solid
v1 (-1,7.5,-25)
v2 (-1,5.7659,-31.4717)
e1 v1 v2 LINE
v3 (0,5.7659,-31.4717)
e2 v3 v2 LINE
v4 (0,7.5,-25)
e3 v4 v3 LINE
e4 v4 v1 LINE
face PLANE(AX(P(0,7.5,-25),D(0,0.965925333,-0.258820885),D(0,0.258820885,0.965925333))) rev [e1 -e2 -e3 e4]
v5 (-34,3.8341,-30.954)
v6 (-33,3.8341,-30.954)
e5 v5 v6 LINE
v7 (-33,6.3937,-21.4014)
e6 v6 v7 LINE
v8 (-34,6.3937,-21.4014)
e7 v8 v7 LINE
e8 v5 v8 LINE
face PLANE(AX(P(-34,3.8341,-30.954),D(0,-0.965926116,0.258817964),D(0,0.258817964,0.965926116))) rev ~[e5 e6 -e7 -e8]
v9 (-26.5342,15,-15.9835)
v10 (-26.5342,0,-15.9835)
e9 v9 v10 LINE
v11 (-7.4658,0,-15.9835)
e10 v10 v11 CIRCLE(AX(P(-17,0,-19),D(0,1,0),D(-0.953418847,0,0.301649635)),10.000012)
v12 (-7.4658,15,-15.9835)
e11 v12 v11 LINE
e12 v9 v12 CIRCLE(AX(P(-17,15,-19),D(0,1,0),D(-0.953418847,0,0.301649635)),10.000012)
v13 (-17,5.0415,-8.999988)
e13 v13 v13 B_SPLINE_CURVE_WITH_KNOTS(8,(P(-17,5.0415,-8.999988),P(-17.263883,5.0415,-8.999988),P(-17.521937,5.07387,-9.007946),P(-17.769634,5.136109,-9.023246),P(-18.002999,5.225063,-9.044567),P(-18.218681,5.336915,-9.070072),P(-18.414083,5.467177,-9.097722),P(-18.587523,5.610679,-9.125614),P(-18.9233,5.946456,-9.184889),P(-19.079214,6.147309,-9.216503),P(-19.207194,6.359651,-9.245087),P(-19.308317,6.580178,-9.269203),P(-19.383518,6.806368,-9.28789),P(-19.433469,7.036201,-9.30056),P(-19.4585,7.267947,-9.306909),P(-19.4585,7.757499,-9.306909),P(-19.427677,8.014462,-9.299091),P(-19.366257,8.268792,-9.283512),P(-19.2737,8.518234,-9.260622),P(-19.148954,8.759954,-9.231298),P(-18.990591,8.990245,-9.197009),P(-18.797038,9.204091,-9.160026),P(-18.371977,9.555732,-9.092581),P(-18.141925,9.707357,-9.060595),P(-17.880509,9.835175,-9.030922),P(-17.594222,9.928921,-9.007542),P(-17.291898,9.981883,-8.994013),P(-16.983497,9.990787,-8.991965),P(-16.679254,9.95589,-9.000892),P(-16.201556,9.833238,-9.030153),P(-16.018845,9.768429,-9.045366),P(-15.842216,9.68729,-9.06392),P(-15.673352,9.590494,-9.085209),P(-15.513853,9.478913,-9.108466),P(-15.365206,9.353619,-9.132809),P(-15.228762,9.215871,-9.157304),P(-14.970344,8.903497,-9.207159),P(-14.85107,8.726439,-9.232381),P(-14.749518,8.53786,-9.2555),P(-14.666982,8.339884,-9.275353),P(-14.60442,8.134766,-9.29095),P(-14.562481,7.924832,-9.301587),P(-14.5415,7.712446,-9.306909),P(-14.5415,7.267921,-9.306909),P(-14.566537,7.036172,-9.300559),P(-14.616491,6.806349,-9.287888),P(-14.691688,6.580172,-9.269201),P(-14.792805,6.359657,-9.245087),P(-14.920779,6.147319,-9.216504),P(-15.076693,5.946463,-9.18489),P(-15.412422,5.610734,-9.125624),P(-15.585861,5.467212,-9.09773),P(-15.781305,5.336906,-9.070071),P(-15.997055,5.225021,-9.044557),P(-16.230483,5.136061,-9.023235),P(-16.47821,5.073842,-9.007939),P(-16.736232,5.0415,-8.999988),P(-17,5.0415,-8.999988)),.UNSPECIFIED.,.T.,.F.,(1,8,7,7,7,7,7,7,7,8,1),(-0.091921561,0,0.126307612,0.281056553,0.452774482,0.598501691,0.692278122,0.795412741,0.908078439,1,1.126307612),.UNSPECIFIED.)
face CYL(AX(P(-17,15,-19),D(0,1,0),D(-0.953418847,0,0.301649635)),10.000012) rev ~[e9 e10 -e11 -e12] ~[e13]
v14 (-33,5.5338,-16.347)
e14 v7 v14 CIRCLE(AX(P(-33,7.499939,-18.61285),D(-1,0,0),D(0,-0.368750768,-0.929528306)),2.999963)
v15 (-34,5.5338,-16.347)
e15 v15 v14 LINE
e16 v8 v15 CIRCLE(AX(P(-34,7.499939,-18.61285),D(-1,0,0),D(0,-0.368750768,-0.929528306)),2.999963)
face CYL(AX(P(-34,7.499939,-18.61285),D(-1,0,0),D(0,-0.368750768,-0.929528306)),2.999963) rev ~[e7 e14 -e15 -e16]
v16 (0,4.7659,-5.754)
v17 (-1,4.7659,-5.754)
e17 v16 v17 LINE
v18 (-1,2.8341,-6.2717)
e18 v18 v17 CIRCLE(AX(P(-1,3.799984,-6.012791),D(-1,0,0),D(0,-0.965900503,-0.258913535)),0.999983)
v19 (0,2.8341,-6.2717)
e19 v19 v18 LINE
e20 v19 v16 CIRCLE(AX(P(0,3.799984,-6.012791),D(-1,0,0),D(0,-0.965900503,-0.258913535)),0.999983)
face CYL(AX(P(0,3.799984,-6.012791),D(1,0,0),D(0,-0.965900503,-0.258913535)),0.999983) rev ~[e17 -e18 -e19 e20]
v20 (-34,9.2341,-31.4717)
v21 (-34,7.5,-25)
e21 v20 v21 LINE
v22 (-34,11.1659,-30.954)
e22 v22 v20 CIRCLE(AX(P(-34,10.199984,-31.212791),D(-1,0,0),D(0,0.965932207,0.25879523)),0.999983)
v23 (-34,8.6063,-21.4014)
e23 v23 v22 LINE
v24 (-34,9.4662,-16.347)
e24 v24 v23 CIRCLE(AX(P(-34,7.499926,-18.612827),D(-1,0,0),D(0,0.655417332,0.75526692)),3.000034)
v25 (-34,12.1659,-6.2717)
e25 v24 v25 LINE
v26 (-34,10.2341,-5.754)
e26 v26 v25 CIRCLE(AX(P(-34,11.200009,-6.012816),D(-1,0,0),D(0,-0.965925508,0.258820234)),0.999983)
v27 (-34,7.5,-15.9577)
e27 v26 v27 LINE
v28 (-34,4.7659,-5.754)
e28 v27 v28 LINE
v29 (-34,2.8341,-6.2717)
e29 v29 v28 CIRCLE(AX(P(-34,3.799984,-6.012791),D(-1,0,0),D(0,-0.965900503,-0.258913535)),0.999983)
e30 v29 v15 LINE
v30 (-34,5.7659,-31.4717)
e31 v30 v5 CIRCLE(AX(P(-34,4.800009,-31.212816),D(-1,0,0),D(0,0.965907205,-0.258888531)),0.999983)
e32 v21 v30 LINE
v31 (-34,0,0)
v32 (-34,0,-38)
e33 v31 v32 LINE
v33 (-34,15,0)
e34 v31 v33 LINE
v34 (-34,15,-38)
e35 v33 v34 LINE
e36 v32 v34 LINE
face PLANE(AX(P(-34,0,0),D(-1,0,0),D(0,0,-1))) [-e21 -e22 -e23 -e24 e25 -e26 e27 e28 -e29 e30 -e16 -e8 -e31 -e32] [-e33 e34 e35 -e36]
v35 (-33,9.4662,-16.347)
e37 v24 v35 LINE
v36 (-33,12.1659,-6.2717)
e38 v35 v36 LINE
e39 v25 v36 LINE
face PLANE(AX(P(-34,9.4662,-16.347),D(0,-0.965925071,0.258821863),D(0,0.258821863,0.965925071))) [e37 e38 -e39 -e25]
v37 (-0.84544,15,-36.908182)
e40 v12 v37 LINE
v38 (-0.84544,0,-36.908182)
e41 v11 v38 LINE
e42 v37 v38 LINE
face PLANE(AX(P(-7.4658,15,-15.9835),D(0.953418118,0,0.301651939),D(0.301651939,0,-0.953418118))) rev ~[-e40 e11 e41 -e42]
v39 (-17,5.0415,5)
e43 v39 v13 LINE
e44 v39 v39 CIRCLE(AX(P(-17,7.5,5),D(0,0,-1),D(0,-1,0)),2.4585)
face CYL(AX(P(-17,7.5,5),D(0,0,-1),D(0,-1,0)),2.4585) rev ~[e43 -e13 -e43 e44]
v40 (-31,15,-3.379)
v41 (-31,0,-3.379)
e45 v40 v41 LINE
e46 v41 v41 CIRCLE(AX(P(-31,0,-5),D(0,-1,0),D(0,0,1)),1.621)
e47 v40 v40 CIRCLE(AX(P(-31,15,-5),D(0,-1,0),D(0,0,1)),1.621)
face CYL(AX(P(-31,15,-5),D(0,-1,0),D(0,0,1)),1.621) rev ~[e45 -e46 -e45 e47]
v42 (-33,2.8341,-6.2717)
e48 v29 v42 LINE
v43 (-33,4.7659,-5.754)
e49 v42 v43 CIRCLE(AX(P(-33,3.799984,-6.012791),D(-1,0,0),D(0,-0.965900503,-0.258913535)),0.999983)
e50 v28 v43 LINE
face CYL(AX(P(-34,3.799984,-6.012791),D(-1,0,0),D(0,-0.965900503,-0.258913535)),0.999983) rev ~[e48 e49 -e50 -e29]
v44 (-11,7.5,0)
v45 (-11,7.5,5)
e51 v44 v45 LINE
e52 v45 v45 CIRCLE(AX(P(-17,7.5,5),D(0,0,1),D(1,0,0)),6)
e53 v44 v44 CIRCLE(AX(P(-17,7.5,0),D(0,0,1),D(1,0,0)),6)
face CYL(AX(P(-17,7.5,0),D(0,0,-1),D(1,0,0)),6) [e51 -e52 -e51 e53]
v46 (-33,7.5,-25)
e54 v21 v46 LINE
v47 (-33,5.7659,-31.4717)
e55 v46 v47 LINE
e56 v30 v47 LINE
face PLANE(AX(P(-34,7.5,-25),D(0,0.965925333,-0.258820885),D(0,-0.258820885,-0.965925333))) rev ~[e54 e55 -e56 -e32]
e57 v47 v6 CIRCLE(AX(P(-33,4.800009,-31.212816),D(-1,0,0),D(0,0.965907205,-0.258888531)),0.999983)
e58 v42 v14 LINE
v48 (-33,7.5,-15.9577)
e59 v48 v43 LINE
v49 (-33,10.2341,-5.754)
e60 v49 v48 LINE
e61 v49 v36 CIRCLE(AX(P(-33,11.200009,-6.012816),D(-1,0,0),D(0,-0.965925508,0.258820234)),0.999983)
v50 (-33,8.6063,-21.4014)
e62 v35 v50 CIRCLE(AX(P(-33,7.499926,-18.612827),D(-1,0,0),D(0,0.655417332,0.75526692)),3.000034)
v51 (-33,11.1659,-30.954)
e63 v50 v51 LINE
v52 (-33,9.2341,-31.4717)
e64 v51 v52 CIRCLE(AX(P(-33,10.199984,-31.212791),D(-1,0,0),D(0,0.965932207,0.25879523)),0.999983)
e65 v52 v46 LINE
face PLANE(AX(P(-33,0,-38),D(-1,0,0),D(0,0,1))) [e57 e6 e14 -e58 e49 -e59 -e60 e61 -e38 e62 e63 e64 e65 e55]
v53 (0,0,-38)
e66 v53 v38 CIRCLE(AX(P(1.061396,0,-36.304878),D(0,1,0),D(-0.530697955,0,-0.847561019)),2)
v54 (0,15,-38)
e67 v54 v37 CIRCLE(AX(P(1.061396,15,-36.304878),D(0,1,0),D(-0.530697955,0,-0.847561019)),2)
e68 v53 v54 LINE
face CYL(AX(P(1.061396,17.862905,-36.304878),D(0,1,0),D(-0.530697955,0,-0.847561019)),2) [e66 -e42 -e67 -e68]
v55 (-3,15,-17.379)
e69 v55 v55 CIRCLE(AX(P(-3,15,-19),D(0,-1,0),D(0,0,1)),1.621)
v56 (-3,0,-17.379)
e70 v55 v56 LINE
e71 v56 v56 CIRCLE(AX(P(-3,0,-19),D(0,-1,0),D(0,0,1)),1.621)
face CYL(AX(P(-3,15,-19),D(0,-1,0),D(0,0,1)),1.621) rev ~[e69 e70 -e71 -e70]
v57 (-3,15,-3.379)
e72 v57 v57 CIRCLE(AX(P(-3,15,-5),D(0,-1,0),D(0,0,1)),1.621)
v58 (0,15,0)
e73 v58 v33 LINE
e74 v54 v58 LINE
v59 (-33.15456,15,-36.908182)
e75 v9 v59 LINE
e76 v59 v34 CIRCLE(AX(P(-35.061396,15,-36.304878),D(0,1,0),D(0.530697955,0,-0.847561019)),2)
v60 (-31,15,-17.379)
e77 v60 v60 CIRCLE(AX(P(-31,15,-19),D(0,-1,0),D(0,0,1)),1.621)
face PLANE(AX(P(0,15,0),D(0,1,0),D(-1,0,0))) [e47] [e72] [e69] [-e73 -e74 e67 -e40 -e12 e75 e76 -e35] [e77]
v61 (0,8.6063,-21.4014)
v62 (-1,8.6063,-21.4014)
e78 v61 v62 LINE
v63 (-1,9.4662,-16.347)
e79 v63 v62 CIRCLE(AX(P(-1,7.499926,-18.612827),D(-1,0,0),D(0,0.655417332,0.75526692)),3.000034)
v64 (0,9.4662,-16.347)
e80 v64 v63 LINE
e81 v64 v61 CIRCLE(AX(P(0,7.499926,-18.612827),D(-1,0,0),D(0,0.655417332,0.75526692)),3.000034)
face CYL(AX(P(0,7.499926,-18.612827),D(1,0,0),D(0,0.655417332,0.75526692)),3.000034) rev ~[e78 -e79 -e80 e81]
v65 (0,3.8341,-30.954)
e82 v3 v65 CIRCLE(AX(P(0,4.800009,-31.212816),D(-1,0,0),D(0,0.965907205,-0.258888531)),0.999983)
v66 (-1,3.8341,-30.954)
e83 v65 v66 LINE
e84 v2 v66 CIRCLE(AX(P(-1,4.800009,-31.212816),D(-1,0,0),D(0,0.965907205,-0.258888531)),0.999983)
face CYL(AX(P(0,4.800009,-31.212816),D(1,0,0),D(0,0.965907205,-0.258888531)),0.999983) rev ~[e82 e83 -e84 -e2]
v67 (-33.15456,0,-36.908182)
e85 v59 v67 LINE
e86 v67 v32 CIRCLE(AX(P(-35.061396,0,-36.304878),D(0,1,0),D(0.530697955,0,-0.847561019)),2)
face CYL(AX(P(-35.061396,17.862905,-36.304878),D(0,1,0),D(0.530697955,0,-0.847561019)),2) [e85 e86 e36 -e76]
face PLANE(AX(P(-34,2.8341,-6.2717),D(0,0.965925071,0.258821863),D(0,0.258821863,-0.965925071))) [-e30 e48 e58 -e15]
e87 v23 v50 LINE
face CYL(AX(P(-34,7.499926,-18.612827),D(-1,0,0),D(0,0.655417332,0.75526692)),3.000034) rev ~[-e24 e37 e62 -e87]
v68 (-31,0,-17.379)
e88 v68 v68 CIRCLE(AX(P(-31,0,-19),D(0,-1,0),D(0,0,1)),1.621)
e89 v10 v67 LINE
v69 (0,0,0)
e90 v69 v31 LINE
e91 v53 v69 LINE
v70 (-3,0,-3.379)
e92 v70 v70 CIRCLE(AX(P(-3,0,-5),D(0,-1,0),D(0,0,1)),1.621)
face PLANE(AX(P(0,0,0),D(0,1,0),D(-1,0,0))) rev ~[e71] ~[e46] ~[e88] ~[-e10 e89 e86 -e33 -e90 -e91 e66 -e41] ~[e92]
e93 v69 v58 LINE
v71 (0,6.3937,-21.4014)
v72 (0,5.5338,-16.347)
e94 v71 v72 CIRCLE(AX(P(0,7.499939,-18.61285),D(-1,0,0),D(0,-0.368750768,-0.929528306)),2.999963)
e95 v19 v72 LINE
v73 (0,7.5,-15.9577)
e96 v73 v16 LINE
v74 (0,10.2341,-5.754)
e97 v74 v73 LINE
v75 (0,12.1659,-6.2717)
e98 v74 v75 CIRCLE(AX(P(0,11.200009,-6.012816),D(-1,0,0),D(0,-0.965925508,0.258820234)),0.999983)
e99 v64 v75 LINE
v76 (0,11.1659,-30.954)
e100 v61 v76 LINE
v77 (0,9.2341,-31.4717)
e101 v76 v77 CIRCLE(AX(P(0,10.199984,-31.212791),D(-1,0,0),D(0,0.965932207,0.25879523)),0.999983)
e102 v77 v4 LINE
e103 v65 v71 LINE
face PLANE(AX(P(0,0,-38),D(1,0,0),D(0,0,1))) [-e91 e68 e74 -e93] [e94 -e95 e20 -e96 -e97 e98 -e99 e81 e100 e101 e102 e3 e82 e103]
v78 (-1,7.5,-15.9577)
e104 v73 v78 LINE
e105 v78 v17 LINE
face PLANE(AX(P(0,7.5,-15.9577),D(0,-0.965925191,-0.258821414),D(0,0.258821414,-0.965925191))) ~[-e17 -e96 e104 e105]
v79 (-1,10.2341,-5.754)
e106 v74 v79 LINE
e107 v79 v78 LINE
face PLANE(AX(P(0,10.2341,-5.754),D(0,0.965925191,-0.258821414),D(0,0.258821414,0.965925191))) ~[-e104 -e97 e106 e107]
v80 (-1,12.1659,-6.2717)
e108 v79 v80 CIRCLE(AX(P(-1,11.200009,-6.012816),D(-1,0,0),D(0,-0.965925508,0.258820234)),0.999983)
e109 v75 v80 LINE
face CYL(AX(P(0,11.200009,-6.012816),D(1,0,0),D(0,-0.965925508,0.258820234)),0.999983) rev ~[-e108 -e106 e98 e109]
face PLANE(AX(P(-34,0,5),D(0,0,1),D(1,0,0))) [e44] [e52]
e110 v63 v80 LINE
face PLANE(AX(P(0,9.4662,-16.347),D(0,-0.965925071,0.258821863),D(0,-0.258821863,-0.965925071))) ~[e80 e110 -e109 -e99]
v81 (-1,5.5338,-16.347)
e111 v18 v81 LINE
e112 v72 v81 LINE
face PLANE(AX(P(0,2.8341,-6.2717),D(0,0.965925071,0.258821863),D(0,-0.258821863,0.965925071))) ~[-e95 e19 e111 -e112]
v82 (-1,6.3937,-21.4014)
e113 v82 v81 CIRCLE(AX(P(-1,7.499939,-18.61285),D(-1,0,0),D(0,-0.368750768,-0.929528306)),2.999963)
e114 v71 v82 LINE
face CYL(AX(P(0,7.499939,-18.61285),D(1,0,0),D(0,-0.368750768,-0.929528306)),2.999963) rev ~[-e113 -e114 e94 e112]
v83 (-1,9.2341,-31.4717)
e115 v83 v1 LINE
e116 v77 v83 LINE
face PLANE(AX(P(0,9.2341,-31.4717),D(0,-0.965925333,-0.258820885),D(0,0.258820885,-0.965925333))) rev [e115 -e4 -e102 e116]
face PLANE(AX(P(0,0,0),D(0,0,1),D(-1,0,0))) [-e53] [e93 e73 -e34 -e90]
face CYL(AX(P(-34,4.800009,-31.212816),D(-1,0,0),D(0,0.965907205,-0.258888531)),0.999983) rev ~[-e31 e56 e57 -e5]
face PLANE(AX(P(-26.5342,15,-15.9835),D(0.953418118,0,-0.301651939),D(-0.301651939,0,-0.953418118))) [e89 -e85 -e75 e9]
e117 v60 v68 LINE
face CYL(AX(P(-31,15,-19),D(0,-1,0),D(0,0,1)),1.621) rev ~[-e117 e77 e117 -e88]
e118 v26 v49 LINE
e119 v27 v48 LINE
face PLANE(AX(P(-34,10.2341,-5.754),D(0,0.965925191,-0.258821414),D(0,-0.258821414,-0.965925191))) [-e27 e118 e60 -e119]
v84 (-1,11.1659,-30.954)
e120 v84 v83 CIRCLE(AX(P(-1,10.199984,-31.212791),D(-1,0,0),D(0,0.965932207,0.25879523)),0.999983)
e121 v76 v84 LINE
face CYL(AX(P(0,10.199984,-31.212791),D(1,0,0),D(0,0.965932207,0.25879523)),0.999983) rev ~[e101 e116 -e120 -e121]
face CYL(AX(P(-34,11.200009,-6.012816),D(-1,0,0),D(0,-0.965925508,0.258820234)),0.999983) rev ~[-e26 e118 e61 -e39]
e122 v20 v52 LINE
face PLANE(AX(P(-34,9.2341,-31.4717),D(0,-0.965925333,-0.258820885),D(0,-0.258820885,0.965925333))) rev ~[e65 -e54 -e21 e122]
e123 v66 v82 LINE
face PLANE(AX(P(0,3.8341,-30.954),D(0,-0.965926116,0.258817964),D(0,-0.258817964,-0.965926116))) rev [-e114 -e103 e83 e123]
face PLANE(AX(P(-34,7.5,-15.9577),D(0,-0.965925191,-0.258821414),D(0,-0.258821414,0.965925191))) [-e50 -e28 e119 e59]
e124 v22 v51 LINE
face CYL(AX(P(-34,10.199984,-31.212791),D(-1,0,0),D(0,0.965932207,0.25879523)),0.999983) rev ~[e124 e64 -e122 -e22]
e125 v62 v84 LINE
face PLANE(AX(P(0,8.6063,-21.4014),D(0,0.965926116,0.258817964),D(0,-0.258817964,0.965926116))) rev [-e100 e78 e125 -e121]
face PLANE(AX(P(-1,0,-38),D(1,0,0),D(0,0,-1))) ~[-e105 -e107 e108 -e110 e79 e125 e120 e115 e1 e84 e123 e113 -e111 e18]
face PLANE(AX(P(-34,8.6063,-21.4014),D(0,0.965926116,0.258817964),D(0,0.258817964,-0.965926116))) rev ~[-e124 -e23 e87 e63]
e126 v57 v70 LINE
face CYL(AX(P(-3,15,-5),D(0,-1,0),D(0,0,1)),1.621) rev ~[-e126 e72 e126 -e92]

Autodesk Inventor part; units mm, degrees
ref_plane "XZ Plane" through (0, 0, 0) normal (0, 1, 0) x (-1, 0, 0)
ref_plane "XY Plane" through (0, 0, 0) normal (0, 0, 1) x (1, 0, 0)
sketch "Sketch1" plane through (0, 0, 0) normal (0, 1, 0) x (-1, 0, 0)
  line L0 (0, 0) -> (34, 0)
  line L1 (34, 0) -> (34, -38)
  line L2 (34, -38) -> (0, -38)
  line L3 (0, -38) -> (0, 0)
  point P0 (17, -38)
  dimension "d0" = 34
  dimension "d1" = 38
extrude "Extrusion1" add sketch "Sketch1" along normal blind 15
sketch "Sketch2" plane through (0, 15, 0) normal (0, 1, 0) x (1, 0, 0)
  arc A0 (-26.5342, 15.9835) -> (-7.4658, 15.9835) centre (-17, 19) ccw
  line L0 (-26.5342, 15.9835) -> (-33.5, 38)
  line L1 (0, 38) -> (-34, 38) projected
  line L2 (-7.4658, 15.9835) -> (-0.5, 38)
  point P0 (0, 0)
  point P1 (-17, 38)
  dimension "d4" = 16.5
  dimension "d5" = 16.5
  dimension "d6" = 10
  dimension "d7" = 19
extrude "Extrusion2" cut sketch "Sketch2" against normal up to surface (15 mm away)
fillet "Fillet1" radius 2 2 edges at (-0.5, 7.5, -38) (-33.5, 7.5, -38)
sketch "Sketch3" plane through (0, 15, 0) normal (0, 1, 0) x (1, 0, 0)
  line L0 (-34, 0) -> (0, 0) projected
  point P0 (-3, 19)
  point P1 (-31, 19)
  point P2 (-17, 0)
  point P3 (-17, 0)
  point P4 (-34, 38)
  dimension "d19" = 14
  dimension "d20" = 14
  dimension "d59" = 19
hole "Hole1" at (-3, 15, -19) at (-31, 15, -19) direction (0, -1, 0) diameter 3.242 depth 15 thread size "M4x0.7" class "6H" standard "ISO Metric profile"
sketch "Sketch4" plane through (0, 15, 0) normal (0, 1, 0) x (1, 0, 0)
  line L0 (-34, 0) -> (0, 0) projected
  point P0 (-31, 5)
  point P1 (-3, 5)
  point P2 (-17, 0)
  point P3 (-17, 0)
  dimension "d28" = 14
  dimension "d29" = 14
  dimension "d30" = 5
hole "Hole2" at (-31, 15, -5) at (-3, 15, -5) direction (0, -1, 0) diameter 3.242 depth 15 thread size "M4x0.7" class "6H" standard "ISO Metric profile"
sketch "Sketch5" plane through (-34, 0, 0) normal (0, 0, 1) x (1, 0, 0)
  circle A0 centre (17, 7.5) radius 6
  line L0 (0, 0) -> (34, 0) projected
  line L1 (0, 0) -> (0, 15) projected
  point P0 (17, 0)
  point P1 (0, 7.5)
  dimension "d31" = 12
extrude "Extrusion3" add sketch "Sketch5" along normal blind 5
sketch "Sketch6" plane through (-17, 7.5, 5) normal (0, 0, 1) x (1, 0, 0)
  circle A0 centre (0, 0) radius 6 projected
  point P0 (17, -7.5)
hole "Hole3" at (-17, 7.5, 5) direction (0, 0, -1) diameter 4.917 depth 15 thread size "M6x1" class "6H" standard "ISO Metric profile"
sketch "Sketch7" plane through (-34, 0, -38) normal (-1, 0, 0) x (0, 0, 1)
  line L0 (16.5986, 8.6063) -> (7.046, 11.1659)
  arc A0 (7.046, 11.1659) -> (6.5283, 9.2341) centre (6.7872, 10.2) ccw
  line L1 (6.5283, 9.2341) -> (13, 7.5)
  line L2 (13, 7.5) -> (6.5283, 5.7659)
  arc A1 (6.5283, 5.7659) -> (7.046, 3.8341) centre (6.7872, 4.8) ccw
  line L3 (7.046, 3.8341) -> (16.5986, 6.3937)
  line L4 (21.653, 9.4662) -> (31.7283, 12.1659)
  arc A2 (32.246, 10.2341) -> (31.7283, 12.1659) centre (31.9872, 11.2) ccw
  line L5 (32.246, 10.2341) -> (22.0423, 7.5)
  line L6 (22.0423, 7.5) -> (32.246, 4.7659)
  arc A3 (31.7283, 2.8341) -> (32.246, 4.7659) centre (31.9872, 3.8) ccw
  line L7 (31.7283, 2.8341) -> (21.653, 5.5338)
  line L8 (0, 0) -> (0, 15) projected
  line L9 (0, 7.5) -> (36.5337, 7.5) construction
  arc A4 (16.5986, 6.3937) -> (21.653, 5.5338) centre (19.3872, 7.5) ccw
  arc A5 (21.653, 9.4662) -> (16.5986, 8.6063) centre (19.3872, 7.5) ccw
  line L10 (0, 15) -> (38, 15) projected
  point P0 (38, 0)
  point P1 (11.8223, 5.1139)
  dimension "d42" = 2
  dimension "d43" = 2
  dimension "d44" = 2
  dimension "d45" = 2
  dimension "d46" = 12.6
  dimension "d47" = 12.6
  dimension "d48" = 26
  dimension "d49" = 26
  dimension "d50" = 30
  dimension "d51" = 30
  dimension "d52" = 3.8
  dimension "d53" = 3
  dimension "d54" = 3
  dimension "d55" = 13
extrude "Extrusion4" cut sketch "Sketch7" against normal blind 1
ref_plane "Work Plane1" through (-17, 0, 0) normal (1, 0, 0) x (0, 1, 0)
mirror "Mirror1" about plane through (-17, 0, 0) normal (1, 0, 0) of "Extrusion4"
equation "\"d5\" = d4"
equation "\"d20\" = d19"
equation "\"d12\" = d20"
equation "\"d29\" = d28"
equation "\"d42\" = d43"
equation "\"d44\" = d43"
equation "\"d47\" = d46"
equation "\"d54\" = d53"
properties part number "2023"
